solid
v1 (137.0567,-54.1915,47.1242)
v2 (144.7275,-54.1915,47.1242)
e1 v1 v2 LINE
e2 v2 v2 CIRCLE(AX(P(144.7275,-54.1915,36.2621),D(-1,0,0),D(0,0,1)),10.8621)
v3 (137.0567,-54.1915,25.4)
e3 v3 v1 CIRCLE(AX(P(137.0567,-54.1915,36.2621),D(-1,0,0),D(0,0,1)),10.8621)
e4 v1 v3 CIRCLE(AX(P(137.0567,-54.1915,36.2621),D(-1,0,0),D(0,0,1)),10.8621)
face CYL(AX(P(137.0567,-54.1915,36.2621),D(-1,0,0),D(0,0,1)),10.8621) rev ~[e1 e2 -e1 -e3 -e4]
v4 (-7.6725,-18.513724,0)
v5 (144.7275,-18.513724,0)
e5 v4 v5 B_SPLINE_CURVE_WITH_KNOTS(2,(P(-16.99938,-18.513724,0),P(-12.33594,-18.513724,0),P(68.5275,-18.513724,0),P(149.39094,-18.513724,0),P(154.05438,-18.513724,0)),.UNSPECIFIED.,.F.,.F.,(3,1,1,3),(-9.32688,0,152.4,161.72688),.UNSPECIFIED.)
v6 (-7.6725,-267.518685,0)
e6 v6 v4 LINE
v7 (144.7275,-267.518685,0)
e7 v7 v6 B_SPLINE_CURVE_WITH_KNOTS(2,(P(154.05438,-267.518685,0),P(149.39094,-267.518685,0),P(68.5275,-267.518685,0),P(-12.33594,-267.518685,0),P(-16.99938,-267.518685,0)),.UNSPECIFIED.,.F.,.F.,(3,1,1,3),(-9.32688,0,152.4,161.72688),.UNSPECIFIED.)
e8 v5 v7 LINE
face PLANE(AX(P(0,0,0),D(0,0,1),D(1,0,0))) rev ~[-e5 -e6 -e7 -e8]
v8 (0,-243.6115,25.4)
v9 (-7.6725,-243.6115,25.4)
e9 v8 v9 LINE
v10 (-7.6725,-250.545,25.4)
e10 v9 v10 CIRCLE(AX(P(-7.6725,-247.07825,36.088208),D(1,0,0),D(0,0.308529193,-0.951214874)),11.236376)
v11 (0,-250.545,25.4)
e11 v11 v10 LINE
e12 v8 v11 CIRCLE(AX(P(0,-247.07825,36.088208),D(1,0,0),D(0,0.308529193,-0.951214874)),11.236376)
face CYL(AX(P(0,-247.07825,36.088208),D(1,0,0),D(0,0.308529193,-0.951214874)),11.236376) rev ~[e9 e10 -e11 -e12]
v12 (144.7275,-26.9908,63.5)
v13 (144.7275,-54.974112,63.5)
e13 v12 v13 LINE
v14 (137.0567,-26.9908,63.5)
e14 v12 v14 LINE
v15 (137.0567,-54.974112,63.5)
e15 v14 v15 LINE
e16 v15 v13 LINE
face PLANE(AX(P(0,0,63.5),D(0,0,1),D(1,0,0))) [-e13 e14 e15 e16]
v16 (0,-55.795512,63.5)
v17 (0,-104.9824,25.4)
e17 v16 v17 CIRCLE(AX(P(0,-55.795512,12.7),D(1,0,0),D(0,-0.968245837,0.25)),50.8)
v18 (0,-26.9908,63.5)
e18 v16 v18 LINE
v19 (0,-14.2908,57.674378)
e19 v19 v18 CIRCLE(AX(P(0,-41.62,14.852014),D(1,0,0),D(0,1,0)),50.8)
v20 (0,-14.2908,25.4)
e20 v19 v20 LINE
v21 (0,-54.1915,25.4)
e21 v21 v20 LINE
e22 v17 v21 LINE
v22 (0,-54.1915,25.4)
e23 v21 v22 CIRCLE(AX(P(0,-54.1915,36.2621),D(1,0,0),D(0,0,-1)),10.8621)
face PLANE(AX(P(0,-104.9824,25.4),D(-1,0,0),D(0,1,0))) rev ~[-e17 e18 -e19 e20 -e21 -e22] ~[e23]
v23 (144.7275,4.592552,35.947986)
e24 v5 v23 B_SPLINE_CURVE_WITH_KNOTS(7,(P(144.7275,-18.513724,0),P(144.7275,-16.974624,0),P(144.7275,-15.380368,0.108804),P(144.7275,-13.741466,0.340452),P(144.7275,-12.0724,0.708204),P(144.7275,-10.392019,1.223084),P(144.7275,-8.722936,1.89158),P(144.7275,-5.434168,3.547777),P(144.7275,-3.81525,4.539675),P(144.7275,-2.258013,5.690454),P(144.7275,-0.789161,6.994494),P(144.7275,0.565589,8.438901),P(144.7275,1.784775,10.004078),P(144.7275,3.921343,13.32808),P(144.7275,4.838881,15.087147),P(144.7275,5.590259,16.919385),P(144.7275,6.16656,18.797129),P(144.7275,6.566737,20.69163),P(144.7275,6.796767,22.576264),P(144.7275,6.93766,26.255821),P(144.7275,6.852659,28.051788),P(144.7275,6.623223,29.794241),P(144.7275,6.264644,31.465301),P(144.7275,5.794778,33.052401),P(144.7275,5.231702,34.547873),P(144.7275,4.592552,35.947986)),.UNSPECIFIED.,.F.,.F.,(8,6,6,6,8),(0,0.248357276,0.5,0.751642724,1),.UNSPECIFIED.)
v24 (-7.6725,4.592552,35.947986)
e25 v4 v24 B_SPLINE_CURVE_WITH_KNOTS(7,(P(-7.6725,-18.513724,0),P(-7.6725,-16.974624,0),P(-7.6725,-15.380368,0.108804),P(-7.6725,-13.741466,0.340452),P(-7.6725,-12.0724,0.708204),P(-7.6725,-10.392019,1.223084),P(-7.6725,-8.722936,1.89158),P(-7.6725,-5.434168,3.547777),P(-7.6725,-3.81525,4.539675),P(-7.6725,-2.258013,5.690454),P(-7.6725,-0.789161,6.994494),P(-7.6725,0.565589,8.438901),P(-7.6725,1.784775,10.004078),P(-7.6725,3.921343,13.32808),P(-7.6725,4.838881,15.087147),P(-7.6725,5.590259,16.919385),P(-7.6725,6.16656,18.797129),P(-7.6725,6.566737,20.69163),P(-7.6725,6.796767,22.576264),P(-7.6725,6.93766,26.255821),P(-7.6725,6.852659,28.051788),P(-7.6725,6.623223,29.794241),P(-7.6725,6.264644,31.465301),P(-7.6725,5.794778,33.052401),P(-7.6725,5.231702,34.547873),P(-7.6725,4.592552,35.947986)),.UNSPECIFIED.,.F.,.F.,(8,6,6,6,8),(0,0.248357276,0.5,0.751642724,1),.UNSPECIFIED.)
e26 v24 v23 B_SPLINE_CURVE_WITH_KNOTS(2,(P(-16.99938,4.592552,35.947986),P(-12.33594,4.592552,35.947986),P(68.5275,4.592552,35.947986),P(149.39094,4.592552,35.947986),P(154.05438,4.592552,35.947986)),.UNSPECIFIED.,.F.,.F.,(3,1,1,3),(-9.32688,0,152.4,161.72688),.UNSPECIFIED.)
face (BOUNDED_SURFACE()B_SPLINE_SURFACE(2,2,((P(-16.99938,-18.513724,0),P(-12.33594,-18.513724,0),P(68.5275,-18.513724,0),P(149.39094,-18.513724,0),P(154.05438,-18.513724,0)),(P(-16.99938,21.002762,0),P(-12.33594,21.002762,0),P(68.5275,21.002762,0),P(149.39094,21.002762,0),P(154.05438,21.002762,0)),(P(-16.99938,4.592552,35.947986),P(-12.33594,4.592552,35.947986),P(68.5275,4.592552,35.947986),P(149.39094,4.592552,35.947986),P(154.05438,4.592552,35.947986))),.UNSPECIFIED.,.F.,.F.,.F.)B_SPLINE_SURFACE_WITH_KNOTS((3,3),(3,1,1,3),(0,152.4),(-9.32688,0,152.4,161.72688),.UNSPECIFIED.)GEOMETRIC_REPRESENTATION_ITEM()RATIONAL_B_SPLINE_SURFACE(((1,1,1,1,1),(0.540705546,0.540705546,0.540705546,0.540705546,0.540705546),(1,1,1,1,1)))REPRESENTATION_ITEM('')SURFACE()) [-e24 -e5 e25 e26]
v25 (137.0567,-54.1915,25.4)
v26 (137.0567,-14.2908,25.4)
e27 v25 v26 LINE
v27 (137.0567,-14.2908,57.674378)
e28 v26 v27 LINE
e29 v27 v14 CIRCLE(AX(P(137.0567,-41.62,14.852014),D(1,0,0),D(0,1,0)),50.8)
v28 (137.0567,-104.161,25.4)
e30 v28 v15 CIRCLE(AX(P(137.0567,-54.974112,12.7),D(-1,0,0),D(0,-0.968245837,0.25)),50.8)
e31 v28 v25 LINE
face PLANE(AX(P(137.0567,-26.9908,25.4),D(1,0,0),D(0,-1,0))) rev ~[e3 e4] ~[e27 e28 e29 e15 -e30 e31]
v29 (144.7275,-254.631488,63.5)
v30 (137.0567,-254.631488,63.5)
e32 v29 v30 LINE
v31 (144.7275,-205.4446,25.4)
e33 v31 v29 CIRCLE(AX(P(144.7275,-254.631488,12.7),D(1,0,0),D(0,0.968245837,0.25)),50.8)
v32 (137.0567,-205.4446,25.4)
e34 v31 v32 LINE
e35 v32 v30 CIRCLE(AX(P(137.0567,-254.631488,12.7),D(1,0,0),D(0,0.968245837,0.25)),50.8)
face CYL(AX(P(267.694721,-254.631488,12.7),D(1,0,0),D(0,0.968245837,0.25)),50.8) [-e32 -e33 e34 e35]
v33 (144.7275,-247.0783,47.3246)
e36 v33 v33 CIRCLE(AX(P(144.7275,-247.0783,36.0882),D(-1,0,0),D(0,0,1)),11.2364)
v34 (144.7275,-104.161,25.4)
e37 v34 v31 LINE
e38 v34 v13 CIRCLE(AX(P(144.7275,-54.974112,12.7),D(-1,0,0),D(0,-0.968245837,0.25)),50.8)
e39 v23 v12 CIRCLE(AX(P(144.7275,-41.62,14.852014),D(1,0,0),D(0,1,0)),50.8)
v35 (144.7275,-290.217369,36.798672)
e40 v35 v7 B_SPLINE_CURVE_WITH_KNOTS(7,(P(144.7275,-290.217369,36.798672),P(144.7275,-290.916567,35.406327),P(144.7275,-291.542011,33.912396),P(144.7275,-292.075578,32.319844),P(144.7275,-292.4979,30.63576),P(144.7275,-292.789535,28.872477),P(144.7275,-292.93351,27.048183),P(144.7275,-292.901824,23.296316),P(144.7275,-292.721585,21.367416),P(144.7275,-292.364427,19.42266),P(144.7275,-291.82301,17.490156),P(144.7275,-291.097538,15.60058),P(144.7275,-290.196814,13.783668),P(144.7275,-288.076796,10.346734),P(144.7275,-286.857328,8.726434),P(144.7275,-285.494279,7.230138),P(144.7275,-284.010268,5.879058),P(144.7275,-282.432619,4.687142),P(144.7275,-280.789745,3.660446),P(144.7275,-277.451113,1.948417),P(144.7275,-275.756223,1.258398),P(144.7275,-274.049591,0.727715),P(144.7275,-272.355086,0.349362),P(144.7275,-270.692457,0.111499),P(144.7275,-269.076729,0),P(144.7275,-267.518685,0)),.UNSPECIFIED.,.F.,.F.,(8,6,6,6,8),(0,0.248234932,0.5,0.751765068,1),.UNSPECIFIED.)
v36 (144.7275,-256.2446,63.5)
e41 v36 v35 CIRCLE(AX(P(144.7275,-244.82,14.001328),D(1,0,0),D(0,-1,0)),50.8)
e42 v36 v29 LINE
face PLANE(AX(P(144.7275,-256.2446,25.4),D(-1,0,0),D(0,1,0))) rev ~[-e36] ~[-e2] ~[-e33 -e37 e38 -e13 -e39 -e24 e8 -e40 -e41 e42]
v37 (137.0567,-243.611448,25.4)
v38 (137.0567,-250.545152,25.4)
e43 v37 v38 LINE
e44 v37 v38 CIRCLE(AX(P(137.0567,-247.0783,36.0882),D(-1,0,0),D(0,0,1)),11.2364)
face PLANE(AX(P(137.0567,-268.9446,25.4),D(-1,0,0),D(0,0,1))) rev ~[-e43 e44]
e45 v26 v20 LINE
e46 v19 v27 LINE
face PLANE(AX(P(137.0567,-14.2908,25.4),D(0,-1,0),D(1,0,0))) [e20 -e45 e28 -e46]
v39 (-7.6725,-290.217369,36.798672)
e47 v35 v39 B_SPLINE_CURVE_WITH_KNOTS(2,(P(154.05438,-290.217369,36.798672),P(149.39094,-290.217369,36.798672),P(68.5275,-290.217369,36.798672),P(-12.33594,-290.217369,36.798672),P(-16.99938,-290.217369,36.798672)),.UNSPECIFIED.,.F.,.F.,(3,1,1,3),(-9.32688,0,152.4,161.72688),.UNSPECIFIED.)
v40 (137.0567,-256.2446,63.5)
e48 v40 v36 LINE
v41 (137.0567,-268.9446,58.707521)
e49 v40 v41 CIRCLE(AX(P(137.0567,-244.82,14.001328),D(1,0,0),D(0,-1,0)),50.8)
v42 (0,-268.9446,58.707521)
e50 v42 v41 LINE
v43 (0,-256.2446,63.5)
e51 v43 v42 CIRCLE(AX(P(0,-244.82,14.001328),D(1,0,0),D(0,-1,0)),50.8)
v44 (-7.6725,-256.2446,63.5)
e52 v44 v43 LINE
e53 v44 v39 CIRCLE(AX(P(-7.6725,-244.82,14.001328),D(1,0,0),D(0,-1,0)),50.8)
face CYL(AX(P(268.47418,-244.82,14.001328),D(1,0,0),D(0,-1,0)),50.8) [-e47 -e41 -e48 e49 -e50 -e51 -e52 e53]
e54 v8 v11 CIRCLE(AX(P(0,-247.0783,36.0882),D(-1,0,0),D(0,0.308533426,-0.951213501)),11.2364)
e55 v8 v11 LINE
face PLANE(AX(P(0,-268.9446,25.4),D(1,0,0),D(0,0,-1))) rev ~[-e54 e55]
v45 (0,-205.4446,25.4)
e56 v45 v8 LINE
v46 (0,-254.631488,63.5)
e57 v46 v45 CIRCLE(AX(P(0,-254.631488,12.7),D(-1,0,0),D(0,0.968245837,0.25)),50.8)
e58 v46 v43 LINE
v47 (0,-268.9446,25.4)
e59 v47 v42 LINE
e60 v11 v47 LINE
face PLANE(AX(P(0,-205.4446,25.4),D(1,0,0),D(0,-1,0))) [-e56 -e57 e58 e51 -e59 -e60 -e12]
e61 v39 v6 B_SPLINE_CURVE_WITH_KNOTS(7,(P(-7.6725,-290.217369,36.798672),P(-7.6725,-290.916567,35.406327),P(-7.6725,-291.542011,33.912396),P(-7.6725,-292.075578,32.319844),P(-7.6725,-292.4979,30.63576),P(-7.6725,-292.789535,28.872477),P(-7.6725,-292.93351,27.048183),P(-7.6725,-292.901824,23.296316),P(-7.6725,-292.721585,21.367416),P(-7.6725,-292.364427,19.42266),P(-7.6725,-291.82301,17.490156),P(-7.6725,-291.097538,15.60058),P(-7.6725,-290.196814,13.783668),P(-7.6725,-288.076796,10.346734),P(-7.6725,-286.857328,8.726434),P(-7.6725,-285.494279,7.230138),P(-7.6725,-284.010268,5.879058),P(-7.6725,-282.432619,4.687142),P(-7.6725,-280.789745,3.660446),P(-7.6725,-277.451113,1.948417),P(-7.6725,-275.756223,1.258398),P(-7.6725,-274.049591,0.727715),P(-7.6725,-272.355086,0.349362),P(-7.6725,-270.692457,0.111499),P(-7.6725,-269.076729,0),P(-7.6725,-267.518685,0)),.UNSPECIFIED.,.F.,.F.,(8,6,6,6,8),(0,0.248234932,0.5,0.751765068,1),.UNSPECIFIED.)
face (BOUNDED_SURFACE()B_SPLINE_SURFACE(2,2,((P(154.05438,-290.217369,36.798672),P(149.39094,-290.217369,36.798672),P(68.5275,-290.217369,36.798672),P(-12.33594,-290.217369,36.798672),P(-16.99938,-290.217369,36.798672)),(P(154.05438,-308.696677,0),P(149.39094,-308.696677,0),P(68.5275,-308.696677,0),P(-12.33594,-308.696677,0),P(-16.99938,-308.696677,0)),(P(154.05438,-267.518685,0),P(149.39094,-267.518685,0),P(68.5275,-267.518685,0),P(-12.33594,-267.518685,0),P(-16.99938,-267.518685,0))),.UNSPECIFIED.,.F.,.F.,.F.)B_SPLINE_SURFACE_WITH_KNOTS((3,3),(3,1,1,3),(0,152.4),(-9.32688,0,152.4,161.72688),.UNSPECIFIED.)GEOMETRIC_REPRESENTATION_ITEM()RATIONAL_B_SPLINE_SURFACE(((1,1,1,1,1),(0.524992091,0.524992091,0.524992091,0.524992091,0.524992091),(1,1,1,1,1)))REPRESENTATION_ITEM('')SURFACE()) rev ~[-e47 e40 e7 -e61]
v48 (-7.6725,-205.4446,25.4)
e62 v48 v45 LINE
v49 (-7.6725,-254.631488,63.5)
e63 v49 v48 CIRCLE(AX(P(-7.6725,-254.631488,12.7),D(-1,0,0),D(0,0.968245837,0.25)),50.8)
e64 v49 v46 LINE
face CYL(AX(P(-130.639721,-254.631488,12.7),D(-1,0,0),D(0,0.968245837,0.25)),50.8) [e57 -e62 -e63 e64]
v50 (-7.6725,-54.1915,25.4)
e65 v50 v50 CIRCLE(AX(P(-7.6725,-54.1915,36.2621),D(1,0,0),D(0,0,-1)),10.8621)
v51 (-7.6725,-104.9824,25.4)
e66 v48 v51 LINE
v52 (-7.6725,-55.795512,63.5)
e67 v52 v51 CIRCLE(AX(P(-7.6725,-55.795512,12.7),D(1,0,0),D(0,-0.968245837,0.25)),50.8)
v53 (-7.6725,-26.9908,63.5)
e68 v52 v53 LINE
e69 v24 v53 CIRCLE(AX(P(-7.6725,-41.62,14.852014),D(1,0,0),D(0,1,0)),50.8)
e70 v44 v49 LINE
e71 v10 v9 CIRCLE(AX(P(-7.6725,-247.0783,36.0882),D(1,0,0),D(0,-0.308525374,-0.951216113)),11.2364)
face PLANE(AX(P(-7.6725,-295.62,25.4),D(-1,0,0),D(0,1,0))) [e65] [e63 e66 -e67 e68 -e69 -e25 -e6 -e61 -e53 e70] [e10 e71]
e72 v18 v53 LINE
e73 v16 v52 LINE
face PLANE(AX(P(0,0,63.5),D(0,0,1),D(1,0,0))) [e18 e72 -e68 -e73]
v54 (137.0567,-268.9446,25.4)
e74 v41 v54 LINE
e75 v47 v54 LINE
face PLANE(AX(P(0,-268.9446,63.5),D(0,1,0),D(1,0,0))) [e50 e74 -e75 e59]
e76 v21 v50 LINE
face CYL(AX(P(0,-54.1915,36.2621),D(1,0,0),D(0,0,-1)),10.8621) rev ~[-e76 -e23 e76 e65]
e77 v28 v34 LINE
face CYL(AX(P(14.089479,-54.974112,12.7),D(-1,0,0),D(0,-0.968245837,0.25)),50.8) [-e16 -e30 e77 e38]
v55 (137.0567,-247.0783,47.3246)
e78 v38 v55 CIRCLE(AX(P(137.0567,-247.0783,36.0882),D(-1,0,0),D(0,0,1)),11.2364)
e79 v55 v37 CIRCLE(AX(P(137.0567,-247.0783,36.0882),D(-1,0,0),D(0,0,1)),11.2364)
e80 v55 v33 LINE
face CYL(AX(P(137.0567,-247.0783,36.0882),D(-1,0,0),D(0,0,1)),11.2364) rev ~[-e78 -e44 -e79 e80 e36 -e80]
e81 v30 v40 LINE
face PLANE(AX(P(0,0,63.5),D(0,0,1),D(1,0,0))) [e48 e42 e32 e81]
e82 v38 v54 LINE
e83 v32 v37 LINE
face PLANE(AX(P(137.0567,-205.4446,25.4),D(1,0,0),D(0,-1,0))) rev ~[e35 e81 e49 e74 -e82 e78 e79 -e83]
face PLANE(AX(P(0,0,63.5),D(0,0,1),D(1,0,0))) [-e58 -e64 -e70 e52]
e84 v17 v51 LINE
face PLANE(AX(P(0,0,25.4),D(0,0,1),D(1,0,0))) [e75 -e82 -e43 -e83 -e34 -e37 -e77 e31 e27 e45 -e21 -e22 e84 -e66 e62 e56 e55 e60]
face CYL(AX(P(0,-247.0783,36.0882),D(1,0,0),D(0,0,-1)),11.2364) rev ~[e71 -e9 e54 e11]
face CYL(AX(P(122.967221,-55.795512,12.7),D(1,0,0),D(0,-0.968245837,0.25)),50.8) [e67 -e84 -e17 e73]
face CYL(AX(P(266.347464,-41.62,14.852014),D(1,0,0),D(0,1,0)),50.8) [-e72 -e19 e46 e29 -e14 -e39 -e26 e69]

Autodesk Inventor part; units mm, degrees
ref_plane "YZ Plane" through (0, 0, 0) normal (1, 0, 0) x (0, 1, 0)
ref_plane "XZ Plane" through (0, 0, 0) normal (0, 1, 0) x (-1, 0, 0)
ref_plane "XY Plane" through (0, 0, 0) normal (0, 0, 1) x (1, 0, 0)
sketch "Sketch1" plane through (0, 0, 0) normal (0, 0, 1) x (1, 0, 0)
  line L0 (-7.6725, 9.18) -> (144.7275, 9.18)
  line L1 (144.7275, 9.18) -> (144.7275, -295.62)
  line L2 (144.7275, -295.62) -> (-7.6725, -295.62)
  line L3 (-7.6725, -295.62) -> (-7.6725, 9.18)
  point P0 (0, 0)
  dimension "d0" = 152.4
  dimension "d1" = 304.8
extrude "Extrusion1" add sketch "Sketch1" along normal blind 25.4
sketch "Sketch2" plane through (0, 0, 25.4) normal (0, 0, 1) x (1, 0, 0)
  line L0 (144.7275, 9.18) -> (-7.6725, 9.18) projected
  line L1 (-7.6725, 9.18) -> (-7.6725, -26.9908)
  line L2 (-7.6725, 9.18) -> (-7.6725, -295.62) projected
  line L3 (144.7275, -295.62) -> (144.7275, 9.18) projected
  line L4 (144.7275, 9.18) -> (144.7275, -26.9908)
  line L5 (144.7275, -26.9908) -> (-7.6725, -26.9908)
  line L6 (-7.6725, 9.18) -> (144.7275, 9.18)
  point P0 (0, 0)
extrude "Extrusion2" add sketch "Sketch2" along normal blind 38.1
fillet "Fillet1" radius 50.8 1 edges at (68.5275, 9.18, 63.5)
sketch "Sketch3" plane through (0, 0, 25.4) normal (0, 0, 1) x (1, 0, 0)
  line L0 (-7.6725, -26.9908) -> (-7.6725, -295.62) projected
  line L1 (-7.6725, -26.9908) -> (-7.6725, -104.161)
  line L2 (0, -104.161) -> (0, -26.9908)
  line L3 (0, -26.9908) -> (-7.6725, -26.9908)
  line L4 (0, -104.161) -> (-7.6725, -104.161)
  line L5 (144.7275, -26.9908) -> (-7.6725, -26.9908) projected
  line L6 (144.7275, -26.9908) -> (137.0567, -26.9908)
  line L7 (137.0567, -26.9908) -> (137.0567, -104.161)
  line L8 (137.0567, -104.161) -> (144.7275, -104.161)
  line L9 (144.7275, 9.18) -> (144.7275, -295.62) projected
  line L10 (144.7275, -26.9908) -> (144.7275, -104.161)
  point P0 (0, 0)
  dimension "d7" = 7.6708
extrude "Extrusion3" add sketch "Sketch3" along normal blind 38.1 contours L9 L8 L7 L5
sketch "Sketch4" plane through (0, 0, 25.4) normal (0, 0, 1) x (1, 0, 0)
  line L0 (-7.6725, -26.9908) -> (-7.6725, 9.18) projected
  line L1 (-7.6725, -26.9908) -> (0, -26.9908)
  line L2 (137.0567, -26.9908) -> (-7.6725, -26.9908) projected
  line L3 (-7.6725, -295.62) -> (-7.6725, 9.18) projected
  line L4 (0, -104.9824) -> (-7.6725, -104.9824)
  line L5 (-7.6725, -26.9908) -> (-7.6725, -104.9824)
  line L6 (0, -104.9824) -> (0, -26.9908)
  point P0 (0, 0)
extrude "Extrusion4" add sketch "Sketch4" along normal blind 38.1
fillet "Fillet2" radius 50.8 1 edges at (-3.8363, -104.9824, 63.5)
fillet "Fillet3" radius 50.8 1 edges at (140.8921, -104.161, 63.5)
sketch "Sketch5" plane through (137.0567, -26.9908, 25.4) normal (0, -1, 0) x (1, 0, 0)
  line L0 (-137.0567, 38.1) -> (0, 38.1) projected
  line L1 (-137.0567, 38.1) -> (-137.0567, 0) projected
  line L2 (-137.0567, 38.1) -> (-137.0567, 0)
  line L3 (0, 0) -> (-137.0567, 0) projected
  line L4 (-137.0567, 0) -> (0, 0)
  line L5 (0, 0) -> (0, 38.1) projected
  line L6 (0, 0) -> (0, 38.1)
  line L7 (0, 38.1) -> (-137.0567, 38.1)
  point P0 (-137.0567, -25.4)
extrude "Extrusion5" cut sketch "Sketch5" against normal blind 12.7
sketch "Sketch6" plane through (0, 0, 25.4) normal (0, 0, 1) x (1, 0, 0)
  line L0 (-7.6725, -295.62) -> (-7.6725, 9.18) projected
  line L1 (144.7275, -295.62) -> (-7.6725, -295.62)
  line L2 (-7.6725, -295.62) -> (-7.6725, -256.2446)
  line L3 (144.7275, -295.62) -> (144.7275, -256.2446)
  line L4 (144.7275, -295.62) -> (144.7275, -104.161) projected
  line L5 (-7.6725, -256.2446) -> (144.7275, -256.2446)
  point P0 (0, 0)
extrude "Extrusion6" add sketch "Sketch6" along normal blind 38.1
fillet "Fillet4" radius 50.8 1 edges at (68.5275, -295.62, 63.5)
sketch "Sketch7" plane through (0, 0, 25.4) normal (0, 0, 1) x (1, 0, 0)
  line L0 (137.676, -256.2446) -> (144.7275, -256.2446)
  line L1 (-7.6725, -295.62) -> (-7.6725, 9.18) projected
  line L2 (-7.6725, -256.2446) -> (144.7275, -256.2446) projected
  line L3 (-7.6725, -256.2446) -> (-7.6725, -205.4446)
  line L4 (-7.6725, -205.4446) -> (0, -205.4446)
  line L5 (0, -205.4446) -> (0, -256.2446)
  point P0 (0, 0)
  dimension "d20" = 50.8
extrude "Extrusion7" add sketch "Sketch7" along normal blind 38.1
sketch "Sketch8" plane through (0, 0, 25.4) normal (0, 0, 1) x (1, 0, 0)
  line L0 (0, -256.2446) -> (144.7275, -256.2446) projected
  line L1 (144.7275, -256.2446) -> (144.7275, -205.4446)
  line L2 (144.7275, -256.2446) -> (144.7275, -104.161) projected
  line L3 (144.7275, -205.4446) -> (137.0567, -205.4446)
  line L4 (137.0567, -205.4446) -> (137.0567, -256.2446)
  line L5 (137.0567, -256.2446) -> (144.7275, -256.2446)
  point P0 (0, 0)
  dimension "d23" = 50.8
  dimension "d24" = 7.6708
extrude "Extrusion8" add sketch "Sketch8" along normal blind 38.1
fillet "Fillet5" radius 50.8 2 edges at (-3.8363, -205.4446, 63.5) (140.8921, -205.4446, 63.5)
sketch "Sketch9" plane through (0, -256.2446, 63.5) normal (0, 1, 0) x (1, 0, 0)
  line L0 (0, 38.1) -> (137.0567, 38.1) projected
  line L1 (137.0567, 38.1) -> (0, 38.1)
  line L2 (0, 38.1) -> (0, 0) projected
  line L3 (0, 38.1) -> (0, 0)
  line L4 (137.0567, 0) -> (0, 0) projected
  line L5 (0, 0) -> (137.0567, 0)
  line L6 (137.0567, 0) -> (137.0567, 38.1)
  point P0 (0, 63.5)
extrude "Extrusion9" cut sketch "Sketch9" against normal blind 12.7
sketch "Sketch10" plane through (144.7275, -295.62, 0) normal (1, 0, 0) x (0, 0, -1)
  point P0 (0, 295.62)
fillet "Fillet6" radius 25.4 1 edges at (68.5275, -295.62, 0)
fillet "Fillet7" radius 25.4 1 edges at (68.5275, 9.18, 0)
sketch "Sketch21" plane through (0, 0, 25.4) normal (0, 0, 1) x (1, 0, 0)
  point P0 (0, 0)
sketch "Sketch22" plane through (0, 0, 25.4) normal (0, 0, 1) x (1, 0, 0)
  point P0 (0, 0)
sketch "Sketch23" plane through (0, -55.7956, 63.5) normal (1, 0, 0) x (0, 0, -1)
  point P0 (63.5, 55.7956)
sketch "Sketch24" plane through (0, -55.7956, 63.5) normal (1, 0, 0) x (0, 0, -1)
  circle A0 centre (27.2379, 1.6041) radius 10.8621
  line L0 (38.1, -49.1869) -> (38.1, 41.5047) projected
  point P0 (63.5, 55.7956)
extrude "Extrusion18" cut sketch "Sketch24" against normal blind 25.4
sketch "Sketch25" plane through (137.0567, -54.9742, 63.5) normal (-1, 0, 0) x (0, 0, 1)
  circle A0 centre (-27.2379, 0.7827) radius 10.8621 projected
  circle A1 centre (-27.2379, 0.7827) radius 10.8621
  point P0 (-63.5, 54.9742)
extrude "Extrusion19" cut sketch "Sketch25" against normal blind 25.4
sketch "Sketch26" plane through (137.0567, -268.9446, 25.4) normal (-1, 0, 0) x (0, 0, 1)
  circle A0 centre (10.6882, 21.8663) radius 11.2364
  point P0 (-25.4, 268.9446)
extrude "Extrusion20" cut sketch "Sketch26" against normal blind 25.4
sketch "Sketch27" plane through (0, -268.9446, 25.4) normal (1, 0, 0) x (0, 0, -1)
  arc A0 (0, 25.3331) -> (0, 18.3996) centre (-10.6882, 21.8663) ccw projected
  circle A1 centre (-10.6882, 21.8663) radius 11.2364
  point P0 (25.4, 268.9446)
extrude "Extrusion21" cut sketch "Sketch27" against normal blind 25.4
properties part number "chasis for robot car"
